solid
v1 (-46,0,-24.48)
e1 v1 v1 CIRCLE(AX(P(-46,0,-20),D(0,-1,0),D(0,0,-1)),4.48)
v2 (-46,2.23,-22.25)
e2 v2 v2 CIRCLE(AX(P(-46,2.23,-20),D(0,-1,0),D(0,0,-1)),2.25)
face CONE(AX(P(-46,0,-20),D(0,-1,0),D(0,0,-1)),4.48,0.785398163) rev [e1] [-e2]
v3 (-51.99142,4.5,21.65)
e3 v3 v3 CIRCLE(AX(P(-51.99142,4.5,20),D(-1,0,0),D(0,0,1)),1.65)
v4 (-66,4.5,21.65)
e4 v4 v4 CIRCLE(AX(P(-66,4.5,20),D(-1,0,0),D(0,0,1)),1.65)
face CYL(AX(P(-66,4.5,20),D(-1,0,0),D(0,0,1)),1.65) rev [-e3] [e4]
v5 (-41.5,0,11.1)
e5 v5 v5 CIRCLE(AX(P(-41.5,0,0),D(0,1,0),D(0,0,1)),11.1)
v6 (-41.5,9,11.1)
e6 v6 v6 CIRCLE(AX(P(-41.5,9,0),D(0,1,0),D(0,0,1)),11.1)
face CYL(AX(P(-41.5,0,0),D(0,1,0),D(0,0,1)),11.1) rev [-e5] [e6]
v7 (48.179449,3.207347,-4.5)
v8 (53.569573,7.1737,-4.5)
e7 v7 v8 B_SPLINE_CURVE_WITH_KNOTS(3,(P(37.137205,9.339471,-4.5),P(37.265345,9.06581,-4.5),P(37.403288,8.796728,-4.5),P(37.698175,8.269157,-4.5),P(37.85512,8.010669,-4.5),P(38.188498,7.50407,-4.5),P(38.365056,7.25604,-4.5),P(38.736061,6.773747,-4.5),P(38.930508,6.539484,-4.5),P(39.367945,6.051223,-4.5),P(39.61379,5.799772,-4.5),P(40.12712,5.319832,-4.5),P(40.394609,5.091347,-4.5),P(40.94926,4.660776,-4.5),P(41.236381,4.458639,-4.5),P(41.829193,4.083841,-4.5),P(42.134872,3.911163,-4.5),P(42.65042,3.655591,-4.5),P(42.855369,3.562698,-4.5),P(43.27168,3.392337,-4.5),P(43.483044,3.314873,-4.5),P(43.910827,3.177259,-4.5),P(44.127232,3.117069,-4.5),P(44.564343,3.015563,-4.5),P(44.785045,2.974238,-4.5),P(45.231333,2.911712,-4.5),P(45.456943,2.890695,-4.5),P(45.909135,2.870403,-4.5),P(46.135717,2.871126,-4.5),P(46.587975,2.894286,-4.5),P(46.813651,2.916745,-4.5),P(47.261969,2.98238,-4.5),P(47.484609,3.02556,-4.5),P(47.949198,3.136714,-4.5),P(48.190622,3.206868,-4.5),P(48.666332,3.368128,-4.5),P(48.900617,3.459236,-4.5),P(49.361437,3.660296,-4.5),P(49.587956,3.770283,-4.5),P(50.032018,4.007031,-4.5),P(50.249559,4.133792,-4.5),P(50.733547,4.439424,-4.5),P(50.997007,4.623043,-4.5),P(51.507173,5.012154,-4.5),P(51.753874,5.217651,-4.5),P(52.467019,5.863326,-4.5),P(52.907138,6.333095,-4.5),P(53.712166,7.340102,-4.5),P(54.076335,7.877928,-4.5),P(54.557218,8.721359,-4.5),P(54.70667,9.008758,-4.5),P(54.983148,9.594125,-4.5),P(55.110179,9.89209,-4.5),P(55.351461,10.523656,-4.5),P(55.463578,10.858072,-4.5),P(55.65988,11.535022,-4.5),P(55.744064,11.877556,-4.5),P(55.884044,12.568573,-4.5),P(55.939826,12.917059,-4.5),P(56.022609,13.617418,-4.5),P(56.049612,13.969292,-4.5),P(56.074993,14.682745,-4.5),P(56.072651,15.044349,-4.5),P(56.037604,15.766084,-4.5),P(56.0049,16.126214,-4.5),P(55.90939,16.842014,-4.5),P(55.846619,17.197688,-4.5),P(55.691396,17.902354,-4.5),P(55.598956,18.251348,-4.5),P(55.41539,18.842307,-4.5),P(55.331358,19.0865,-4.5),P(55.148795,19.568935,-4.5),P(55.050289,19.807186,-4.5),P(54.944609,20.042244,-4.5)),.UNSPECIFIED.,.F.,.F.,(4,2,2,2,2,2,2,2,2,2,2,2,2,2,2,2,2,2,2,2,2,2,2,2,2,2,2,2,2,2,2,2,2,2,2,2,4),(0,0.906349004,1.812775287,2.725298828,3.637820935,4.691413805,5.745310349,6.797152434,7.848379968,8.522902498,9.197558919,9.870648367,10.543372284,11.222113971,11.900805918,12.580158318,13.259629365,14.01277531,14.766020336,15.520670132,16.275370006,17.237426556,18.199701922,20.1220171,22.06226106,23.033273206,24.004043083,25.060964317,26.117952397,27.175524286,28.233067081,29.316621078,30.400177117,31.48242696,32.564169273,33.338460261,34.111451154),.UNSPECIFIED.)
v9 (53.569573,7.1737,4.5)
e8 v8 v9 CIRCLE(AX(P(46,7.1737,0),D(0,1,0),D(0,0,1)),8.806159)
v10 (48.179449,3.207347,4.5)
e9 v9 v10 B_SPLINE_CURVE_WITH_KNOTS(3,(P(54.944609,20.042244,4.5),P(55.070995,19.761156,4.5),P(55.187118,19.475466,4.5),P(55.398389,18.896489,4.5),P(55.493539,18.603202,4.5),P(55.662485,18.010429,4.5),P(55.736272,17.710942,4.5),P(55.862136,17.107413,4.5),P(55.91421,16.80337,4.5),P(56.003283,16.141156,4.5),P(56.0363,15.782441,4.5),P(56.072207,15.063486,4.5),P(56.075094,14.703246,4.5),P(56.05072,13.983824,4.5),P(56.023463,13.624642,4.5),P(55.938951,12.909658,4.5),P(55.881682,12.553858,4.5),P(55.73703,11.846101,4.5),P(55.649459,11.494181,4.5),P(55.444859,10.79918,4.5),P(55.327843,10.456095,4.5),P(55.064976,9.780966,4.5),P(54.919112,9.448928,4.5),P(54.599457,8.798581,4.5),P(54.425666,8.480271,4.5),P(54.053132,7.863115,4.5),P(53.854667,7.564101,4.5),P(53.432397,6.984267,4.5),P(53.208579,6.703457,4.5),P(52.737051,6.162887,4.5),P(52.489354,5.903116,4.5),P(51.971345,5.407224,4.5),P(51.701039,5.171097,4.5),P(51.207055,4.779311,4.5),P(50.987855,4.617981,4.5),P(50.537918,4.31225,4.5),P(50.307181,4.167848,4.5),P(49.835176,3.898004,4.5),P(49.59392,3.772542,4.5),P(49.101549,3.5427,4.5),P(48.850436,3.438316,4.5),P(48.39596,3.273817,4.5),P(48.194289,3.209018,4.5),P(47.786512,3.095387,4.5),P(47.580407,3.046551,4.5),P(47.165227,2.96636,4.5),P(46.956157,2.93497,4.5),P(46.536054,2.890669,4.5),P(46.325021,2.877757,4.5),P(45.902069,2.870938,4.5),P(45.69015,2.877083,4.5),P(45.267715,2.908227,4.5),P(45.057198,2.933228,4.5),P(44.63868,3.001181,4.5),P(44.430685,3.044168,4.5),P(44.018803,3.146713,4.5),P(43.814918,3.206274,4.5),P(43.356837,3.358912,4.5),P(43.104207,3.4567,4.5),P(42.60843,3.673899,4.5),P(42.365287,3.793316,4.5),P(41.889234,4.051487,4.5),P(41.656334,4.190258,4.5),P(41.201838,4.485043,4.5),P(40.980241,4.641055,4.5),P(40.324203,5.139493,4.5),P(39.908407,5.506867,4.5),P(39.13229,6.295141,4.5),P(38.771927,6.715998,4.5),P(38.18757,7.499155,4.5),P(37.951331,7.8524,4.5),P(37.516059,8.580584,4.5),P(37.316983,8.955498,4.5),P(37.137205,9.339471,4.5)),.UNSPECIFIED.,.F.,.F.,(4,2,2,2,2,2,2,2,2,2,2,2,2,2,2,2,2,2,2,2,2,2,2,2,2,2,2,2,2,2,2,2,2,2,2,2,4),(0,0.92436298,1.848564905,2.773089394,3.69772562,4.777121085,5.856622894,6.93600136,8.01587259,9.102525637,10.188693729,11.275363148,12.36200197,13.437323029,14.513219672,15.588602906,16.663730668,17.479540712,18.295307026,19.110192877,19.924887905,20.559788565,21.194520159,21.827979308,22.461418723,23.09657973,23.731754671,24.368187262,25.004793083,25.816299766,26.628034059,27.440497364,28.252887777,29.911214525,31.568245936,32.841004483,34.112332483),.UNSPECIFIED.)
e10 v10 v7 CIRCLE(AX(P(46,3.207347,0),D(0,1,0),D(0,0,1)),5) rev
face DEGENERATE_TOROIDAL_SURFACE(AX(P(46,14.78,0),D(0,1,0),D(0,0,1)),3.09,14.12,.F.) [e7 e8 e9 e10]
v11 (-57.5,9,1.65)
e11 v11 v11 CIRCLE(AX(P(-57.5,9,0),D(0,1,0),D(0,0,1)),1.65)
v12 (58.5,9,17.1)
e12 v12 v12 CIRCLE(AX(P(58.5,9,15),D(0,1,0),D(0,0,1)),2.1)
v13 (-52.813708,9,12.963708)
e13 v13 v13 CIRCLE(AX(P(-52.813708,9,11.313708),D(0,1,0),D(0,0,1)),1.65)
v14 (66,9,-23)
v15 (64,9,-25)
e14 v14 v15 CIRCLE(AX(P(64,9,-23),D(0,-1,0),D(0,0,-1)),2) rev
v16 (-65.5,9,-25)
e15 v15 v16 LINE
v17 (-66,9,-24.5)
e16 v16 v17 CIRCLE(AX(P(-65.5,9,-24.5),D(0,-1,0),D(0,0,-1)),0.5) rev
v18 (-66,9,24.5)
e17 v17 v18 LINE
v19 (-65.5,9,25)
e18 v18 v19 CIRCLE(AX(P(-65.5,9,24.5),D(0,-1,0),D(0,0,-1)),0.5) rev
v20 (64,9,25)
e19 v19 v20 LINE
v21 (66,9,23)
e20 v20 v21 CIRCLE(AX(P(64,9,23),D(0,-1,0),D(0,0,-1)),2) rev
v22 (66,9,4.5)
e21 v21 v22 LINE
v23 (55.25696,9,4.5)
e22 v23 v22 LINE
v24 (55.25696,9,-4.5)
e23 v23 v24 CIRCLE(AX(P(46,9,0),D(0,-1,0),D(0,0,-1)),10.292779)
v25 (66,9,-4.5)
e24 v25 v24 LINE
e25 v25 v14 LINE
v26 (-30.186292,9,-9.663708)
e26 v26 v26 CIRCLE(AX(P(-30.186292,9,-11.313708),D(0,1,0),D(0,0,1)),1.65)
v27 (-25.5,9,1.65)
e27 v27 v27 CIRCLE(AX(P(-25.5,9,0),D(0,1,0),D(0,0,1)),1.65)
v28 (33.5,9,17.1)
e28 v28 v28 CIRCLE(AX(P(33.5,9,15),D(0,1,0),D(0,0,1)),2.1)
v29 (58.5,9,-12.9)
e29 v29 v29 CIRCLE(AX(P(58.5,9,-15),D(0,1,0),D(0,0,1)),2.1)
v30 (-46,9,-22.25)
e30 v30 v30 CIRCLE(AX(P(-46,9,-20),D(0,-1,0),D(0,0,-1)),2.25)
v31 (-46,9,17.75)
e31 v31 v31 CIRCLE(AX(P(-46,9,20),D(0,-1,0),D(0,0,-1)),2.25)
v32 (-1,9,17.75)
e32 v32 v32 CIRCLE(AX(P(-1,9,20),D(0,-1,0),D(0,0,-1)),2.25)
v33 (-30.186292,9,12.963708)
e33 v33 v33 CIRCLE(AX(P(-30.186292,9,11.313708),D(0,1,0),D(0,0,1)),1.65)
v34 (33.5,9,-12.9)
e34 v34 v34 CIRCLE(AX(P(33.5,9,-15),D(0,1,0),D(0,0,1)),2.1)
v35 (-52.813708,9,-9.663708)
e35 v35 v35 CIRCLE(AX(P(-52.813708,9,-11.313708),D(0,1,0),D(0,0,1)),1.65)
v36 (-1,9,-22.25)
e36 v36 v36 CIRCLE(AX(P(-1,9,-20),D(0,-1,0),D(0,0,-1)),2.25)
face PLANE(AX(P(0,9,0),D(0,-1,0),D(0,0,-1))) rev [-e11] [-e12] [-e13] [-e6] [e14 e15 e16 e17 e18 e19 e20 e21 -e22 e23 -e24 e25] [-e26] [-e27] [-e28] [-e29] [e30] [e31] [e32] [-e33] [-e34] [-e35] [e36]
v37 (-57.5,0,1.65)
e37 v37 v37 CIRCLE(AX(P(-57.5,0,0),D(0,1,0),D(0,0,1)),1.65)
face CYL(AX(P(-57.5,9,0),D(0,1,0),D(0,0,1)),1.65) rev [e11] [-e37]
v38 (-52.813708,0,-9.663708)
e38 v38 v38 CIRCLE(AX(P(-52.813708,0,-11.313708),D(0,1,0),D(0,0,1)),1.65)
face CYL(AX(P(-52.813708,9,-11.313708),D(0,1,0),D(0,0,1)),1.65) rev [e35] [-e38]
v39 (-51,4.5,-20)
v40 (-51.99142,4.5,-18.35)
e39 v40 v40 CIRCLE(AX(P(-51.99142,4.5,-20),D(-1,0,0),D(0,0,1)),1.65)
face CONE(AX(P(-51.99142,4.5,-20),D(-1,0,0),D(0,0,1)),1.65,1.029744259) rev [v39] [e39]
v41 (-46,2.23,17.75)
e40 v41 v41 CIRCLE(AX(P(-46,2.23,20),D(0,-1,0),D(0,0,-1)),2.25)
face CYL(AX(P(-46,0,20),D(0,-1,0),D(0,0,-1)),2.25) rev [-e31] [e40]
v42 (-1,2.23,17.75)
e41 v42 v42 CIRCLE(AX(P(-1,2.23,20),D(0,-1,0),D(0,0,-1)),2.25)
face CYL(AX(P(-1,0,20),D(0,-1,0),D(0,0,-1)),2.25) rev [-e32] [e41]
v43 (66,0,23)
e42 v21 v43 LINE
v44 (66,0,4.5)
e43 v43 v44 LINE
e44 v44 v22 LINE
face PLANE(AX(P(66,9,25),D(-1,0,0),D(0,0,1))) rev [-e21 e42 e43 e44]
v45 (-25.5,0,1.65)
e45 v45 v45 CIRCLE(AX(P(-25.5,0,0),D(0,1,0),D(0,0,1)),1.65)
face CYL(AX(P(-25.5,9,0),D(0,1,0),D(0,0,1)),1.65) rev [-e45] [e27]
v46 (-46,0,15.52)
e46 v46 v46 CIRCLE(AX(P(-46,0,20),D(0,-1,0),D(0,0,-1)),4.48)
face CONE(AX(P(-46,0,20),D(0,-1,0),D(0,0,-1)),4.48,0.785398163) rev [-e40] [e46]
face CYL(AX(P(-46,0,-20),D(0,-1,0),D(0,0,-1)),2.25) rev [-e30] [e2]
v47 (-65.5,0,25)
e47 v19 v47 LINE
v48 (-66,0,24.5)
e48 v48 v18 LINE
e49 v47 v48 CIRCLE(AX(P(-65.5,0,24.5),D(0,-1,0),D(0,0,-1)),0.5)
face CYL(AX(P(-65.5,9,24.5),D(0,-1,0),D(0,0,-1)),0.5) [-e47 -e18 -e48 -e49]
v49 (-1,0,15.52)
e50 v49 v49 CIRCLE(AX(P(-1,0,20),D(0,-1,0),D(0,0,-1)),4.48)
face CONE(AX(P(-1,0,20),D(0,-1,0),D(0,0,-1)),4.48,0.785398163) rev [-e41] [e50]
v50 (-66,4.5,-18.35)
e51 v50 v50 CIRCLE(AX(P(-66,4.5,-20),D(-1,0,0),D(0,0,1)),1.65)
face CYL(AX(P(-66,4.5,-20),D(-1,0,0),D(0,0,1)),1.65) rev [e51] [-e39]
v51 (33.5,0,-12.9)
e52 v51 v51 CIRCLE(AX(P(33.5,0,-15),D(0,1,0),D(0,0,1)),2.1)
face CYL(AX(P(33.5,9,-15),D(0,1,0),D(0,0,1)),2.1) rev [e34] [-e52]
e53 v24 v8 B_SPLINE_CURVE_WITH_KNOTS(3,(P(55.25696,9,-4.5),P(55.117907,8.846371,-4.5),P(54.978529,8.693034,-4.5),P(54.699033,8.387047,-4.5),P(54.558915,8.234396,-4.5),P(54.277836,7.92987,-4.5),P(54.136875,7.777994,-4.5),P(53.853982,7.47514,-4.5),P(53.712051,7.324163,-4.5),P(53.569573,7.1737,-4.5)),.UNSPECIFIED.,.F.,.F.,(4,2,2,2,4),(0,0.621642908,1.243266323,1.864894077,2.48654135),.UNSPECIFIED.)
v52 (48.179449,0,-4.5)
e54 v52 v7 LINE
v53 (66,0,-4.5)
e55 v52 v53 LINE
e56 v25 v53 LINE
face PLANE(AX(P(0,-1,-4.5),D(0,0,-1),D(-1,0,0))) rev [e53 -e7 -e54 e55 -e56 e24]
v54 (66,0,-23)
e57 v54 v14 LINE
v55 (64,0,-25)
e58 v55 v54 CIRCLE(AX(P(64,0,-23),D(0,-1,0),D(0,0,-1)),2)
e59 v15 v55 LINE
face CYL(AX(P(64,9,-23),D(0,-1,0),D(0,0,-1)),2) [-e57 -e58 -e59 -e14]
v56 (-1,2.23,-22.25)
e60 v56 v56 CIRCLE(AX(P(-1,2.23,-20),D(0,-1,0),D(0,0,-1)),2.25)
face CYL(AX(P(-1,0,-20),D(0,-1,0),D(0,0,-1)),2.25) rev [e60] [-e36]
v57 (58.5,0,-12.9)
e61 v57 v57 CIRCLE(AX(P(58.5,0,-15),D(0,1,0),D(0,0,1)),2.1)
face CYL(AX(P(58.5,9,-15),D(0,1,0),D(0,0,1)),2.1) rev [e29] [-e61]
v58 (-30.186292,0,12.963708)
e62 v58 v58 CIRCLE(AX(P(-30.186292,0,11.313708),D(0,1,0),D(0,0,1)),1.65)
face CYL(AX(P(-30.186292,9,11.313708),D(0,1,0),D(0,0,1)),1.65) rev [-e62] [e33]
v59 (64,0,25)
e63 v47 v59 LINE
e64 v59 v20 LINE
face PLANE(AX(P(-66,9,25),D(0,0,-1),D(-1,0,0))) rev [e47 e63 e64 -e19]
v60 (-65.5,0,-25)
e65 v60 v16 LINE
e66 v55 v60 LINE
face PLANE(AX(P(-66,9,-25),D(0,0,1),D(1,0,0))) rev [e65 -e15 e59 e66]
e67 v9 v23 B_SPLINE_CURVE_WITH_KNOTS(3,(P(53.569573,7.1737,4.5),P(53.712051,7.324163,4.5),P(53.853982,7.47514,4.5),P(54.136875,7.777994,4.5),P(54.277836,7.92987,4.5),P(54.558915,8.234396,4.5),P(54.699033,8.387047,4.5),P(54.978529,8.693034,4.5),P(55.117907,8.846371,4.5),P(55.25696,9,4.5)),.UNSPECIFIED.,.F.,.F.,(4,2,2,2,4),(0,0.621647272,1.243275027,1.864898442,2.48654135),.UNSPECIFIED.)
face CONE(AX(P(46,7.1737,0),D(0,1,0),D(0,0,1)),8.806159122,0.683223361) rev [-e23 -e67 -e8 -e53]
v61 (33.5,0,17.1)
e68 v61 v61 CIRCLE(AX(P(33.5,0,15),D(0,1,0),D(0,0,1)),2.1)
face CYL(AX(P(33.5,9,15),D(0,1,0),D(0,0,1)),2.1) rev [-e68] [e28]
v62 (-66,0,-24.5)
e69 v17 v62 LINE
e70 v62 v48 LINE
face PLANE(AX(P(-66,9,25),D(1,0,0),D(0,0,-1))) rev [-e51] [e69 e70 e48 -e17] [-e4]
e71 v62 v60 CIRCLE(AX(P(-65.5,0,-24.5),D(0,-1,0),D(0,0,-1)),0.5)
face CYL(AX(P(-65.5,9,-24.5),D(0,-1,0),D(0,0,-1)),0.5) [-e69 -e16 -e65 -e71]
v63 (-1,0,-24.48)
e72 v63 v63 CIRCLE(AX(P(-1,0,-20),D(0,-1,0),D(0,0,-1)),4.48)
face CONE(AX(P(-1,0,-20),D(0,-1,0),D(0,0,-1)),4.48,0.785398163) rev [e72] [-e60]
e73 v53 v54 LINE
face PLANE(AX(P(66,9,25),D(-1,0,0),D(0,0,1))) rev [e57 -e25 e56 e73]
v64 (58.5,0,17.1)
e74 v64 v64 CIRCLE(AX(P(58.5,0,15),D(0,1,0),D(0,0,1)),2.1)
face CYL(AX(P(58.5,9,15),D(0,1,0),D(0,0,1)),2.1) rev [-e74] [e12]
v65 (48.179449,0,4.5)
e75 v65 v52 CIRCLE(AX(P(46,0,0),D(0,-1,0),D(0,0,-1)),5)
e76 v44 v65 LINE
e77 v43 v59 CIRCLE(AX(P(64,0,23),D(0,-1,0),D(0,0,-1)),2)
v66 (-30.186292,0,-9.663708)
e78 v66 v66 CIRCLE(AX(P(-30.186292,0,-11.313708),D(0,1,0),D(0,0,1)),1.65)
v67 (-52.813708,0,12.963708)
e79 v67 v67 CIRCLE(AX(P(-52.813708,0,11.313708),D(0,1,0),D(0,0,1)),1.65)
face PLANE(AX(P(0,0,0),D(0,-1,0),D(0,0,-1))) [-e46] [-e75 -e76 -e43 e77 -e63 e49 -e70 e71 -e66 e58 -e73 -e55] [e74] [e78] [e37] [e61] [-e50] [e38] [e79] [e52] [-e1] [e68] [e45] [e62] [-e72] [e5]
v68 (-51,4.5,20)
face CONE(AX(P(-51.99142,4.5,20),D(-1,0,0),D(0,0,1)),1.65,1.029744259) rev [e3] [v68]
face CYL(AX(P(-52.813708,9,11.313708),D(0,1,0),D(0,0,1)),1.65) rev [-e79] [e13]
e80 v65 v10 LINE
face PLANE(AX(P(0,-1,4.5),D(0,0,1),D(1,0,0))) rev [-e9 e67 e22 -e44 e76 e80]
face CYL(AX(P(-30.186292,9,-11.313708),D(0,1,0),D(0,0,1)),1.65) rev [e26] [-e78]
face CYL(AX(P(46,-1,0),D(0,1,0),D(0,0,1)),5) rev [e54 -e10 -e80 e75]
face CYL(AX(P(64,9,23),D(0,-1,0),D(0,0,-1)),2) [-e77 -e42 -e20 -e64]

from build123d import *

# Parameters (mm, degrees)
SKETCH1_W                                            = 132
SKETCH1_H                                            = 50
BOSS_EXTRUDE1_DEPTH                                  = 9
M4_TAPPED_HOLE1_D                                    = 3.3
M4_TAPPED_HOLE1_DEPTH                                = 14.008579979
M4_TAPPED_HOLE1_TIP                                  = 0.991420021
FILLET1_R                                            = 0.5
SKETCH5_R                                            = 11.1
CUT_EXTRUDE1_DEPTH                                   = 72.147733625
M5_TAPPED_HOLE1_D                                    = 4.2
CSK_FOR_M4_HEX_SOCKET_COUNTERSUNK_CAP_SC_D           = 4.5
CSK_FOR_M4_HEX_SOCKET_COUNTERSUNK_CAP_SC_CSINK_D     = 8.96
CSK_FOR_M4_HEX_SOCKET_COUNTERSUNK_CAP_SC_CSINK_ANGLE = 90
M4_TAPPED_HOLE2_D                                    = 3.3
CIRPATTERN1_COUNT                                    = 8
CUT_EXTRUDE2_DEPTH                                   = 10
CHAMFER1_SIZE                                        = 0.5
FILLET2_R                                            = 2


with BuildPart() as part:
    # Sketch1 → Boss-Extrude1 (new body)
    with BuildSketch(Plane(origin=(0, 0, 0), x_dir=(1, 0, 0), z_dir=(0, 1, 0))):
        Rectangle(SKETCH1_W, SKETCH1_H)
    extrude(amount=BOSS_EXTRUDE1_DEPTH)

    # M4 Tapped Hole1
    with Locations(Plane.ZY.offset(66)):
        with Locations((-20, 4.5), (20, 4.5)):
            Hole(M4_TAPPED_HOLE1_D / 2, depth=M4_TAPPED_HOLE1_DEPTH)
            with Locations((0, 0, -(M4_TAPPED_HOLE1_DEPTH + M4_TAPPED_HOLE1_TIP / 2))):  # 118° drill point
                Cone(0, M4_TAPPED_HOLE1_D / 2, M4_TAPPED_HOLE1_TIP, mode=Mode.SUBTRACT)

    # Fillet1
    fillet1_edges = [part.edges().sort_by_distance(p)[0] for p in [
        (-66, 4.5, 25),
        (-66, 4.5, -25),
    ]]
    fillet(fillet1_edges, radius=FILLET1_R)

    # Sketch5 → Cut-Extrude1 (cut, through all)
    with BuildSketch(Plane(origin=(0, 9, 0), x_dir=(1, 0, 0), z_dir=(0, 1, 0))):
        with Locations(Location((-41.5, 0, 0), (0, 0, 270))):
            Circle(SKETCH5_R)
    extrude(amount=-CUT_EXTRUDE1_DEPTH, mode=Mode.SUBTRACT)

    # M5 Tapped Hole1 (through all)
    with Locations(Plane(origin=(0, 9, 0), x_dir=(1, 0, 0), z_dir=(0, 1, 0))):
        with Locations((33.5, 15), (33.5, -15), (58.5, -15), (58.5, 15)):
            Hole(M5_TAPPED_HOLE1_D / 2)

    # CSK for M4 Hex Socket Countersunk Cap Screw1 (through all)
    with Locations(Plane(origin=(0, 0, 0), x_dir=(-1, 0, 0), z_dir=(0, -1, 0))):
        with Locations((1, -20), (46, -20), (46, 20), (1, 20)):
            CounterSinkHole(CSK_FOR_M4_HEX_SOCKET_COUNTERSUNK_CAP_SC_D / 2, CSK_FOR_M4_HEX_SOCKET_COUNTERSUNK_CAP_SC_CSINK_D / 2, counter_sink_angle=CSK_FOR_M4_HEX_SOCKET_COUNTERSUNK_CAP_SC_CSINK_ANGLE)

    # M4 Tapped Hole2 (through all)
    with Locations(Plane(origin=(0, 9, 0), x_dir=(1, 0, 0), z_dir=(0, 1, 0))):
        with Locations((-57.5, 0)):
            m4_tapped_hole2 = Hole(M4_TAPPED_HOLE2_D / 2)

    # CirPattern1: M4 Tapped Hole2 ×8 about axis, 2 skipped
    cirpattern1_axis = Axis((-41.5, 0, 0), (0, -1, 0))
    add([m4_tapped_hole2.rotate(cirpattern1_axis, i * 360 / CIRPATTERN1_COUNT) for i in range(1, CIRPATTERN1_COUNT) if i not in (2, 6)], mode=Mode.SUBTRACT)

    # Sketch17 → Cut-Extrude2 (cut)
    with BuildSketch(Plane(origin=(0, 9, 0), x_dir=(1, 0, 0), z_dir=(0, 1, 0))):
        with BuildLine():
            Line((66, -4.5), (66, 4.5))
            Line((66, 4.5), (48.179449472, 4.5))
            ThreePointArc((48.179449472, 4.5), (41, 0), (48.179449472, -4.5))
            Line((48.179449472, -4.5), (66, -4.5))
        make_face()
    extrude(amount=-CUT_EXTRUDE2_DEPTH, mode=Mode.SUBTRACT)

    # Sketch18 → Cut-Revolve1 (revolve, cut)
    with BuildSketch(Plane.XY):
        with BuildLine():
            Line((46, 9), (46, 1.00225345))
            ThreePointArc((46, 1.00225345), (51.841595957, 3.843776079), (55.792779203, 9))
            Line((55.792779203, 9), (46, 9))
        make_face()
    revolve(axis=Axis((46, 9, 0), (0, -1, 0)), mode=Mode.SUBTRACT)

    # Chamfer1
    # the kernel refuses this chamfer: 1.5, 0.5 mm, written as the material it takes off along each edge
    with BuildSketch(Plane(origin=(46, 9, 0), x_dir=(0.9999950652018582, 0, 0.003141587485879922), z_dir=(0.003141587485879922, 0, -0.9999950652018582))) as chamfer1_piece_1:
        with BuildLine():
            Line((9.792779203 + CHAMFER1_SIZE, 0), (8.806159122, 1.826299898))
            ThreePointArc((8.806159122, 1.826299898), (9.31899594, 0.957300628), (9.792779203, 0))
            Line((9.792779203, 0), (9.792779203 + CHAMFER1_SIZE, 0))
        make_face()
    revolve(axis=Axis((46, 9, 0), (0, -1, 0)), revolution_arc=359.64, mode=Mode.SUBTRACT)

    # Fillet2
    fillet2_edges = [part.edges().sort_by_distance(p)[0] for p in [
        (66, 4.5, 25),
        (66, 4.5, -25),
    ]]
    fillet(fillet2_edges, radius=FILLET2_R)


solid = part.part
